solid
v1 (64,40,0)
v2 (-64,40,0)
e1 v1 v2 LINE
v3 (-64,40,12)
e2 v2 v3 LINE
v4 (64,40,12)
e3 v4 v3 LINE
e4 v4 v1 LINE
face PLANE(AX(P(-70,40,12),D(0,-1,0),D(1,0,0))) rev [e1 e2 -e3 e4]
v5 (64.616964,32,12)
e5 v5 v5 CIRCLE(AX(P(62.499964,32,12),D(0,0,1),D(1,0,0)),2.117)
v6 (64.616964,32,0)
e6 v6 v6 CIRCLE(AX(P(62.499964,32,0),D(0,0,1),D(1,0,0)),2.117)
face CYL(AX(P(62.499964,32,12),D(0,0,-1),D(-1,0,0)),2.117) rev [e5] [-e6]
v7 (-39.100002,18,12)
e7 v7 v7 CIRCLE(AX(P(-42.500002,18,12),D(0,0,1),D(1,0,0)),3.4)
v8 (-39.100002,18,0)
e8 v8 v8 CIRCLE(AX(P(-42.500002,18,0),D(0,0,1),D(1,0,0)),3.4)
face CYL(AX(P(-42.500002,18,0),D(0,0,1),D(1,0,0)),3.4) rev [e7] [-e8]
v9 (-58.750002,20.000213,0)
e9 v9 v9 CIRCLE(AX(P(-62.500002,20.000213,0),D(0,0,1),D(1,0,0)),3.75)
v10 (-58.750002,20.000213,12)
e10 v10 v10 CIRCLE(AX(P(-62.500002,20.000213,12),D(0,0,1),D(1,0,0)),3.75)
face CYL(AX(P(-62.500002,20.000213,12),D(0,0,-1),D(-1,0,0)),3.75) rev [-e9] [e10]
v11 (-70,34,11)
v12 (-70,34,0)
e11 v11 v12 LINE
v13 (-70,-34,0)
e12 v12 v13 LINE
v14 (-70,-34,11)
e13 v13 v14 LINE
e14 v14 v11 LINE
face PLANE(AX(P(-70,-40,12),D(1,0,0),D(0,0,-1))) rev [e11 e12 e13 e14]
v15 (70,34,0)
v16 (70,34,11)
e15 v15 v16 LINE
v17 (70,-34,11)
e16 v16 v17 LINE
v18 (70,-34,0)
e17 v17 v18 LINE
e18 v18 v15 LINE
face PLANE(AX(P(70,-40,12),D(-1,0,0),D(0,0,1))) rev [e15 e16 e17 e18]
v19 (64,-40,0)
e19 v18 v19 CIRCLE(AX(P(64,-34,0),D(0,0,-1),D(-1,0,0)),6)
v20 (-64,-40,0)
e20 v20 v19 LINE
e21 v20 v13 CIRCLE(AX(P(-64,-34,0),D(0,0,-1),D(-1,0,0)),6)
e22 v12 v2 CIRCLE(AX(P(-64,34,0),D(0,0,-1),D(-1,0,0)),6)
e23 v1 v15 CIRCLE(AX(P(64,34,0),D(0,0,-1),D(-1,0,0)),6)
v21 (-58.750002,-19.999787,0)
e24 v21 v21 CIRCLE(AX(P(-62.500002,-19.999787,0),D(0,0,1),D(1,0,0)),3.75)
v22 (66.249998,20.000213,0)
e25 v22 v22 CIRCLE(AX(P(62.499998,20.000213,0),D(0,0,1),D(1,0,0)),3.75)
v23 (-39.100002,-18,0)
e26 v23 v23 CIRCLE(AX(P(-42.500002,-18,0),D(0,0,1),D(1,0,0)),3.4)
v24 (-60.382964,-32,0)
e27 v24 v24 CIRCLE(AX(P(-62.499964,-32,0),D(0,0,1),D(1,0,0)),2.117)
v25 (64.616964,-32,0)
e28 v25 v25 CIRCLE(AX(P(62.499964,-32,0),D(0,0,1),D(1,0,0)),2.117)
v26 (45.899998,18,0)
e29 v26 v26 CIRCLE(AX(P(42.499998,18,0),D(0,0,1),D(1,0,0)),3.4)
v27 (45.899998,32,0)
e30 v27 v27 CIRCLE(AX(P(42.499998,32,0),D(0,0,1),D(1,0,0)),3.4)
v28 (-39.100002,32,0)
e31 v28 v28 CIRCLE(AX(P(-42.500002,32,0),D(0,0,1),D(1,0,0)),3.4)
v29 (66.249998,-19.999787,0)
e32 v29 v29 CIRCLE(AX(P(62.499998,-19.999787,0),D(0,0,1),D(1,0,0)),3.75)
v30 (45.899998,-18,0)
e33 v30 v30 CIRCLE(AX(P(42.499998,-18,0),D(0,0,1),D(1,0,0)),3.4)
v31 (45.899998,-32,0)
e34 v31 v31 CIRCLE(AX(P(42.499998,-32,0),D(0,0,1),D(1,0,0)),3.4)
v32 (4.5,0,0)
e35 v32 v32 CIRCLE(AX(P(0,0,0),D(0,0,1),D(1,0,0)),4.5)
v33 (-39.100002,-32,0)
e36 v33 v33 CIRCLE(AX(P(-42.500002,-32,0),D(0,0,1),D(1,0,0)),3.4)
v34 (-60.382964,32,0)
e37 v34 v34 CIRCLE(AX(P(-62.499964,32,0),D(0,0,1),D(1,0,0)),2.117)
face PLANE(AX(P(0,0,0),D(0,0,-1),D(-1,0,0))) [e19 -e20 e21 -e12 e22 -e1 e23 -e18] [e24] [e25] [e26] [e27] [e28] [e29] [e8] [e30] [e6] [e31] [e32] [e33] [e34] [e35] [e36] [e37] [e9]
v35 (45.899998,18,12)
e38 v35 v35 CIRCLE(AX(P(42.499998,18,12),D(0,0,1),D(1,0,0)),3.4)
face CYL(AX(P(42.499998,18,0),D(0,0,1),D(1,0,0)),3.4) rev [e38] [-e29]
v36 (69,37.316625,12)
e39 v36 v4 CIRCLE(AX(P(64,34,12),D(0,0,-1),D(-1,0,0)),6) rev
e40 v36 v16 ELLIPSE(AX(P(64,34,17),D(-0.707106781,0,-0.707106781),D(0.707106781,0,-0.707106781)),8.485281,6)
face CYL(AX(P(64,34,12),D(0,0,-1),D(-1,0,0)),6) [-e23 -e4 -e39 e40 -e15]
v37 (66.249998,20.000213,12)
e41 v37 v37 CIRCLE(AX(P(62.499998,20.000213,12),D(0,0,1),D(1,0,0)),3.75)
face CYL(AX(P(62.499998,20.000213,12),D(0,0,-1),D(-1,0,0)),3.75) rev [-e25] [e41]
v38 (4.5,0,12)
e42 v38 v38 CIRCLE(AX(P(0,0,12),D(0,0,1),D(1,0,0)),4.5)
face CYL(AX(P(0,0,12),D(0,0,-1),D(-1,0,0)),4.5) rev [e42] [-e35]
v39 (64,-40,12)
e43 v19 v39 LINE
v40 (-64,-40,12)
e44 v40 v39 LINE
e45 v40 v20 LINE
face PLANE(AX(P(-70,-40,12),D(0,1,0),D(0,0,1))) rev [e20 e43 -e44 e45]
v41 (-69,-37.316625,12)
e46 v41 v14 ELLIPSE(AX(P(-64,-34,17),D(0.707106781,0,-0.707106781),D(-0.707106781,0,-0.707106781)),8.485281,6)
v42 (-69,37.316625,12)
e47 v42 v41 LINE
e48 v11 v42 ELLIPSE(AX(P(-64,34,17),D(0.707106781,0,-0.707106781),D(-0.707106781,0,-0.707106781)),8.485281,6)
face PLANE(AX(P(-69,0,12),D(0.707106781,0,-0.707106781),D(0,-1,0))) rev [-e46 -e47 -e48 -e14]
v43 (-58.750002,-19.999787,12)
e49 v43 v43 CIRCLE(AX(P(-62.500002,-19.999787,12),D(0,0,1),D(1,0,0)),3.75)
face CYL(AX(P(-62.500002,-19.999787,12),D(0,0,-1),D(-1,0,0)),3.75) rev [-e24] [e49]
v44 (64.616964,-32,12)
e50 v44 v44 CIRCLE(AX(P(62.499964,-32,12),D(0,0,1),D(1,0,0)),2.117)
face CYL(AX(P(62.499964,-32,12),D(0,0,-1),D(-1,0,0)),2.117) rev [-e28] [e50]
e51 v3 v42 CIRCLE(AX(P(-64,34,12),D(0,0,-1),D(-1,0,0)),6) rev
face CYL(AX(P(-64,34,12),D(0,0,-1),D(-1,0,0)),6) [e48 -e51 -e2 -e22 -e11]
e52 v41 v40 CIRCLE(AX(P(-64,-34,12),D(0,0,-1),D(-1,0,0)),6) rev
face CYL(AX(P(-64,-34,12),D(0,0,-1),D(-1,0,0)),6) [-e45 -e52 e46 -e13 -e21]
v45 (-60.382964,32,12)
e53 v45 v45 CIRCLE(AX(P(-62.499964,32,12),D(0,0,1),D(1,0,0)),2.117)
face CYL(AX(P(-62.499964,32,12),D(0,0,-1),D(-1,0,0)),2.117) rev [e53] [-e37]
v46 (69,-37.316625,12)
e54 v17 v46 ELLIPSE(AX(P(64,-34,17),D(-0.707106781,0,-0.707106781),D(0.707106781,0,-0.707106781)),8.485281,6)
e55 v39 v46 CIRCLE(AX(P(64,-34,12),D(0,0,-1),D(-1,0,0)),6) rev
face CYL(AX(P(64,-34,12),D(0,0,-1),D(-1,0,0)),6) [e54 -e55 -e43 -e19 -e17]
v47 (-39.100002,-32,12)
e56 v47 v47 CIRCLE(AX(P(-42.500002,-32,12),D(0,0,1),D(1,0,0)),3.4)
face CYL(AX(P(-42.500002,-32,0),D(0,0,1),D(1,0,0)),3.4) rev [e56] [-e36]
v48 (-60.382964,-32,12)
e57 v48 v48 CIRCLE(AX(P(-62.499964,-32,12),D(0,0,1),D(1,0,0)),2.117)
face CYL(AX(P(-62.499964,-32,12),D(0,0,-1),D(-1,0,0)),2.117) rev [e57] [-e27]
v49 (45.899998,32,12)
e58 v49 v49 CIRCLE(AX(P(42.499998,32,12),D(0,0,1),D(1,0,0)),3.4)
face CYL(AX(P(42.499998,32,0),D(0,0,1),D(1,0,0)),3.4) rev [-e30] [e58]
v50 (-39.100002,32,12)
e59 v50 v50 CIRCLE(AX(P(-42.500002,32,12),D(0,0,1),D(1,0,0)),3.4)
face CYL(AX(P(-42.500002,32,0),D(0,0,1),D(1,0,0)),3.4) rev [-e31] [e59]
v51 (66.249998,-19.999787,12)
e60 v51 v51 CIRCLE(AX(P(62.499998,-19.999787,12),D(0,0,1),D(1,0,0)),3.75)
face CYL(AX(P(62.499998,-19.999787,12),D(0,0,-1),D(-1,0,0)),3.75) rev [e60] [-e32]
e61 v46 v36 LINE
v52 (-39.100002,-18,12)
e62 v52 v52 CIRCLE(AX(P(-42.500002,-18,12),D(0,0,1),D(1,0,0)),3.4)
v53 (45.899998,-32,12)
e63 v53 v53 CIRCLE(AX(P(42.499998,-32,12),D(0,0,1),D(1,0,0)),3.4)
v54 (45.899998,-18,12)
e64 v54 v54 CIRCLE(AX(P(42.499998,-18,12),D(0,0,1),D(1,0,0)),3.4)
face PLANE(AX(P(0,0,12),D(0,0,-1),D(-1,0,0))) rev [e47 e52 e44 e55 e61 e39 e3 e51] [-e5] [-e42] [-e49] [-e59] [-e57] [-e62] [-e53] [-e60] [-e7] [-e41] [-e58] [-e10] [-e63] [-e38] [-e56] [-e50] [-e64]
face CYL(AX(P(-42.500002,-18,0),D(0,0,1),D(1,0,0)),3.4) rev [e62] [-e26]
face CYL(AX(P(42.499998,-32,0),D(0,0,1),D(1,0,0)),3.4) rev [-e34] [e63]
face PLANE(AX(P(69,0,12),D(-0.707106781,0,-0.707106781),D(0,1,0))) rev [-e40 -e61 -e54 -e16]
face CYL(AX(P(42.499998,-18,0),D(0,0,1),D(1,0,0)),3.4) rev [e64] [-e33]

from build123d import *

# Parameters (mm, degrees)
SKETCH1_W           = 140
SKETCH1_H           = 80
SKETCH1_R           = 2.117
SKETCH1_R_2         = 3.75
SKETCH1_R_3         = 4.5
BOSS_EXTRUDE1_DEPTH = 12
SKETCH2_R           = 3.4
CUT_EXTRUDE1_DEPTH  = 82.510735489
FILLET1_R           = 6


with BuildPart() as part:
    # Sketch1 → Boss-Extrude1 (new body)
    with BuildSketch(Plane.XY):
        Rectangle(SKETCH1_W, SKETCH1_H)
        with Locations((-62.499963671, 32)):
            Circle(SKETCH1_R, mode=Mode.SUBTRACT)
        with Locations((-62.500002371, 20.00021325)):
            Circle(SKETCH1_R_2, mode=Mode.SUBTRACT)
        with Locations((-62.499963671, -32)):
            Circle(SKETCH1_R, mode=Mode.SUBTRACT)
        with Locations((-62.500002371, -19.99978675)):
            Circle(SKETCH1_R_2, mode=Mode.SUBTRACT)
        Circle(SKETCH1_R_3, mode=Mode.SUBTRACT)
        with Locations((62.499963671, 32)):
            Circle(SKETCH1_R, mode=Mode.SUBTRACT)
        with Locations((62.499997629, 20.00021325)):
            Circle(SKETCH1_R_2, mode=Mode.SUBTRACT)
        with Locations((62.499997629, -19.99978675)):
            Circle(SKETCH1_R_2, mode=Mode.SUBTRACT)
        with Locations((62.499963671, -32)):
            Circle(SKETCH1_R, mode=Mode.SUBTRACT)
    extrude(amount=BOSS_EXTRUDE1_DEPTH)

    # Sketch2 → Cut-Extrude1 (cut, through all)
    with BuildSketch(Plane.XY.offset(12)):
        with Locations((42.499997629, 32)):
            Circle(SKETCH2_R)
        with Locations((-42.500002371, 32)):
            Circle(SKETCH2_R)
        with Locations((-42.500002371, 18)):
            Circle(SKETCH2_R)
        with Locations((42.499997629, 18)):
            Circle(SKETCH2_R)
        with Locations((42.499997629, -18)):
            Circle(SKETCH2_R)
        with Locations((42.499997629, -32)):
            Circle(SKETCH2_R)
        with Locations((-42.500002371, -32)):
            Circle(SKETCH2_R)
        with Locations((-42.500002371, -18)):
            Circle(SKETCH2_R)
    extrude(amount=-CUT_EXTRUDE1_DEPTH, mode=Mode.SUBTRACT)

    # Fillet1
    fillet1_edges = [part.edges().sort_by_distance(p)[0] for p in [
        (70, -40, 6),
        (-70, -40, 6),
        (-70, 40, 6),
        (70, 40, 6),
    ]]
    fillet(fillet1_edges, radius=FILLET1_R)

    # Chamfer1
    # the kernel refuses this chamfer: 1 mm, written as the material it takes off along each edge
    with BuildSketch(Plane(origin=(-70, 40.172039171, 12), x_dir=(0.9996219169112968, 0, 0.02749587661058574), z_dir=(0, -1, 0)), Plane(origin=(70, -40.172039171, 12), x_dir=(-0.9996219169112968, 0, 0.02749587661058574), z_dir=(0, 1, 0))) as chamfer1_piece_1:
        with BuildLine():
            Line((1.028673195, 0), (-0.056547155, -1.027117794))
            Line((-0.056547155, -1.027117794), (-0.076539593, -1.026567876))
            ThreePointArc((-0.076539593, -1.026567876), (-0.034129227, -0.51339783), (-0.019992438, 0.000549918))
            Line((-0.019992438, 0.000549918), (0.000549918, 0.019992438))
            ThreePointArc((0.000549918, 0.019992438), (0.514497665, 0.00585565), (1.029223113, 0.019992438))
            Line((1.029223113, 0.019992438), (1.028673195, 0))
        make_face()
    extrude(amount=80.344078342, mode=Mode.SUBTRACT)


solid = part.part
